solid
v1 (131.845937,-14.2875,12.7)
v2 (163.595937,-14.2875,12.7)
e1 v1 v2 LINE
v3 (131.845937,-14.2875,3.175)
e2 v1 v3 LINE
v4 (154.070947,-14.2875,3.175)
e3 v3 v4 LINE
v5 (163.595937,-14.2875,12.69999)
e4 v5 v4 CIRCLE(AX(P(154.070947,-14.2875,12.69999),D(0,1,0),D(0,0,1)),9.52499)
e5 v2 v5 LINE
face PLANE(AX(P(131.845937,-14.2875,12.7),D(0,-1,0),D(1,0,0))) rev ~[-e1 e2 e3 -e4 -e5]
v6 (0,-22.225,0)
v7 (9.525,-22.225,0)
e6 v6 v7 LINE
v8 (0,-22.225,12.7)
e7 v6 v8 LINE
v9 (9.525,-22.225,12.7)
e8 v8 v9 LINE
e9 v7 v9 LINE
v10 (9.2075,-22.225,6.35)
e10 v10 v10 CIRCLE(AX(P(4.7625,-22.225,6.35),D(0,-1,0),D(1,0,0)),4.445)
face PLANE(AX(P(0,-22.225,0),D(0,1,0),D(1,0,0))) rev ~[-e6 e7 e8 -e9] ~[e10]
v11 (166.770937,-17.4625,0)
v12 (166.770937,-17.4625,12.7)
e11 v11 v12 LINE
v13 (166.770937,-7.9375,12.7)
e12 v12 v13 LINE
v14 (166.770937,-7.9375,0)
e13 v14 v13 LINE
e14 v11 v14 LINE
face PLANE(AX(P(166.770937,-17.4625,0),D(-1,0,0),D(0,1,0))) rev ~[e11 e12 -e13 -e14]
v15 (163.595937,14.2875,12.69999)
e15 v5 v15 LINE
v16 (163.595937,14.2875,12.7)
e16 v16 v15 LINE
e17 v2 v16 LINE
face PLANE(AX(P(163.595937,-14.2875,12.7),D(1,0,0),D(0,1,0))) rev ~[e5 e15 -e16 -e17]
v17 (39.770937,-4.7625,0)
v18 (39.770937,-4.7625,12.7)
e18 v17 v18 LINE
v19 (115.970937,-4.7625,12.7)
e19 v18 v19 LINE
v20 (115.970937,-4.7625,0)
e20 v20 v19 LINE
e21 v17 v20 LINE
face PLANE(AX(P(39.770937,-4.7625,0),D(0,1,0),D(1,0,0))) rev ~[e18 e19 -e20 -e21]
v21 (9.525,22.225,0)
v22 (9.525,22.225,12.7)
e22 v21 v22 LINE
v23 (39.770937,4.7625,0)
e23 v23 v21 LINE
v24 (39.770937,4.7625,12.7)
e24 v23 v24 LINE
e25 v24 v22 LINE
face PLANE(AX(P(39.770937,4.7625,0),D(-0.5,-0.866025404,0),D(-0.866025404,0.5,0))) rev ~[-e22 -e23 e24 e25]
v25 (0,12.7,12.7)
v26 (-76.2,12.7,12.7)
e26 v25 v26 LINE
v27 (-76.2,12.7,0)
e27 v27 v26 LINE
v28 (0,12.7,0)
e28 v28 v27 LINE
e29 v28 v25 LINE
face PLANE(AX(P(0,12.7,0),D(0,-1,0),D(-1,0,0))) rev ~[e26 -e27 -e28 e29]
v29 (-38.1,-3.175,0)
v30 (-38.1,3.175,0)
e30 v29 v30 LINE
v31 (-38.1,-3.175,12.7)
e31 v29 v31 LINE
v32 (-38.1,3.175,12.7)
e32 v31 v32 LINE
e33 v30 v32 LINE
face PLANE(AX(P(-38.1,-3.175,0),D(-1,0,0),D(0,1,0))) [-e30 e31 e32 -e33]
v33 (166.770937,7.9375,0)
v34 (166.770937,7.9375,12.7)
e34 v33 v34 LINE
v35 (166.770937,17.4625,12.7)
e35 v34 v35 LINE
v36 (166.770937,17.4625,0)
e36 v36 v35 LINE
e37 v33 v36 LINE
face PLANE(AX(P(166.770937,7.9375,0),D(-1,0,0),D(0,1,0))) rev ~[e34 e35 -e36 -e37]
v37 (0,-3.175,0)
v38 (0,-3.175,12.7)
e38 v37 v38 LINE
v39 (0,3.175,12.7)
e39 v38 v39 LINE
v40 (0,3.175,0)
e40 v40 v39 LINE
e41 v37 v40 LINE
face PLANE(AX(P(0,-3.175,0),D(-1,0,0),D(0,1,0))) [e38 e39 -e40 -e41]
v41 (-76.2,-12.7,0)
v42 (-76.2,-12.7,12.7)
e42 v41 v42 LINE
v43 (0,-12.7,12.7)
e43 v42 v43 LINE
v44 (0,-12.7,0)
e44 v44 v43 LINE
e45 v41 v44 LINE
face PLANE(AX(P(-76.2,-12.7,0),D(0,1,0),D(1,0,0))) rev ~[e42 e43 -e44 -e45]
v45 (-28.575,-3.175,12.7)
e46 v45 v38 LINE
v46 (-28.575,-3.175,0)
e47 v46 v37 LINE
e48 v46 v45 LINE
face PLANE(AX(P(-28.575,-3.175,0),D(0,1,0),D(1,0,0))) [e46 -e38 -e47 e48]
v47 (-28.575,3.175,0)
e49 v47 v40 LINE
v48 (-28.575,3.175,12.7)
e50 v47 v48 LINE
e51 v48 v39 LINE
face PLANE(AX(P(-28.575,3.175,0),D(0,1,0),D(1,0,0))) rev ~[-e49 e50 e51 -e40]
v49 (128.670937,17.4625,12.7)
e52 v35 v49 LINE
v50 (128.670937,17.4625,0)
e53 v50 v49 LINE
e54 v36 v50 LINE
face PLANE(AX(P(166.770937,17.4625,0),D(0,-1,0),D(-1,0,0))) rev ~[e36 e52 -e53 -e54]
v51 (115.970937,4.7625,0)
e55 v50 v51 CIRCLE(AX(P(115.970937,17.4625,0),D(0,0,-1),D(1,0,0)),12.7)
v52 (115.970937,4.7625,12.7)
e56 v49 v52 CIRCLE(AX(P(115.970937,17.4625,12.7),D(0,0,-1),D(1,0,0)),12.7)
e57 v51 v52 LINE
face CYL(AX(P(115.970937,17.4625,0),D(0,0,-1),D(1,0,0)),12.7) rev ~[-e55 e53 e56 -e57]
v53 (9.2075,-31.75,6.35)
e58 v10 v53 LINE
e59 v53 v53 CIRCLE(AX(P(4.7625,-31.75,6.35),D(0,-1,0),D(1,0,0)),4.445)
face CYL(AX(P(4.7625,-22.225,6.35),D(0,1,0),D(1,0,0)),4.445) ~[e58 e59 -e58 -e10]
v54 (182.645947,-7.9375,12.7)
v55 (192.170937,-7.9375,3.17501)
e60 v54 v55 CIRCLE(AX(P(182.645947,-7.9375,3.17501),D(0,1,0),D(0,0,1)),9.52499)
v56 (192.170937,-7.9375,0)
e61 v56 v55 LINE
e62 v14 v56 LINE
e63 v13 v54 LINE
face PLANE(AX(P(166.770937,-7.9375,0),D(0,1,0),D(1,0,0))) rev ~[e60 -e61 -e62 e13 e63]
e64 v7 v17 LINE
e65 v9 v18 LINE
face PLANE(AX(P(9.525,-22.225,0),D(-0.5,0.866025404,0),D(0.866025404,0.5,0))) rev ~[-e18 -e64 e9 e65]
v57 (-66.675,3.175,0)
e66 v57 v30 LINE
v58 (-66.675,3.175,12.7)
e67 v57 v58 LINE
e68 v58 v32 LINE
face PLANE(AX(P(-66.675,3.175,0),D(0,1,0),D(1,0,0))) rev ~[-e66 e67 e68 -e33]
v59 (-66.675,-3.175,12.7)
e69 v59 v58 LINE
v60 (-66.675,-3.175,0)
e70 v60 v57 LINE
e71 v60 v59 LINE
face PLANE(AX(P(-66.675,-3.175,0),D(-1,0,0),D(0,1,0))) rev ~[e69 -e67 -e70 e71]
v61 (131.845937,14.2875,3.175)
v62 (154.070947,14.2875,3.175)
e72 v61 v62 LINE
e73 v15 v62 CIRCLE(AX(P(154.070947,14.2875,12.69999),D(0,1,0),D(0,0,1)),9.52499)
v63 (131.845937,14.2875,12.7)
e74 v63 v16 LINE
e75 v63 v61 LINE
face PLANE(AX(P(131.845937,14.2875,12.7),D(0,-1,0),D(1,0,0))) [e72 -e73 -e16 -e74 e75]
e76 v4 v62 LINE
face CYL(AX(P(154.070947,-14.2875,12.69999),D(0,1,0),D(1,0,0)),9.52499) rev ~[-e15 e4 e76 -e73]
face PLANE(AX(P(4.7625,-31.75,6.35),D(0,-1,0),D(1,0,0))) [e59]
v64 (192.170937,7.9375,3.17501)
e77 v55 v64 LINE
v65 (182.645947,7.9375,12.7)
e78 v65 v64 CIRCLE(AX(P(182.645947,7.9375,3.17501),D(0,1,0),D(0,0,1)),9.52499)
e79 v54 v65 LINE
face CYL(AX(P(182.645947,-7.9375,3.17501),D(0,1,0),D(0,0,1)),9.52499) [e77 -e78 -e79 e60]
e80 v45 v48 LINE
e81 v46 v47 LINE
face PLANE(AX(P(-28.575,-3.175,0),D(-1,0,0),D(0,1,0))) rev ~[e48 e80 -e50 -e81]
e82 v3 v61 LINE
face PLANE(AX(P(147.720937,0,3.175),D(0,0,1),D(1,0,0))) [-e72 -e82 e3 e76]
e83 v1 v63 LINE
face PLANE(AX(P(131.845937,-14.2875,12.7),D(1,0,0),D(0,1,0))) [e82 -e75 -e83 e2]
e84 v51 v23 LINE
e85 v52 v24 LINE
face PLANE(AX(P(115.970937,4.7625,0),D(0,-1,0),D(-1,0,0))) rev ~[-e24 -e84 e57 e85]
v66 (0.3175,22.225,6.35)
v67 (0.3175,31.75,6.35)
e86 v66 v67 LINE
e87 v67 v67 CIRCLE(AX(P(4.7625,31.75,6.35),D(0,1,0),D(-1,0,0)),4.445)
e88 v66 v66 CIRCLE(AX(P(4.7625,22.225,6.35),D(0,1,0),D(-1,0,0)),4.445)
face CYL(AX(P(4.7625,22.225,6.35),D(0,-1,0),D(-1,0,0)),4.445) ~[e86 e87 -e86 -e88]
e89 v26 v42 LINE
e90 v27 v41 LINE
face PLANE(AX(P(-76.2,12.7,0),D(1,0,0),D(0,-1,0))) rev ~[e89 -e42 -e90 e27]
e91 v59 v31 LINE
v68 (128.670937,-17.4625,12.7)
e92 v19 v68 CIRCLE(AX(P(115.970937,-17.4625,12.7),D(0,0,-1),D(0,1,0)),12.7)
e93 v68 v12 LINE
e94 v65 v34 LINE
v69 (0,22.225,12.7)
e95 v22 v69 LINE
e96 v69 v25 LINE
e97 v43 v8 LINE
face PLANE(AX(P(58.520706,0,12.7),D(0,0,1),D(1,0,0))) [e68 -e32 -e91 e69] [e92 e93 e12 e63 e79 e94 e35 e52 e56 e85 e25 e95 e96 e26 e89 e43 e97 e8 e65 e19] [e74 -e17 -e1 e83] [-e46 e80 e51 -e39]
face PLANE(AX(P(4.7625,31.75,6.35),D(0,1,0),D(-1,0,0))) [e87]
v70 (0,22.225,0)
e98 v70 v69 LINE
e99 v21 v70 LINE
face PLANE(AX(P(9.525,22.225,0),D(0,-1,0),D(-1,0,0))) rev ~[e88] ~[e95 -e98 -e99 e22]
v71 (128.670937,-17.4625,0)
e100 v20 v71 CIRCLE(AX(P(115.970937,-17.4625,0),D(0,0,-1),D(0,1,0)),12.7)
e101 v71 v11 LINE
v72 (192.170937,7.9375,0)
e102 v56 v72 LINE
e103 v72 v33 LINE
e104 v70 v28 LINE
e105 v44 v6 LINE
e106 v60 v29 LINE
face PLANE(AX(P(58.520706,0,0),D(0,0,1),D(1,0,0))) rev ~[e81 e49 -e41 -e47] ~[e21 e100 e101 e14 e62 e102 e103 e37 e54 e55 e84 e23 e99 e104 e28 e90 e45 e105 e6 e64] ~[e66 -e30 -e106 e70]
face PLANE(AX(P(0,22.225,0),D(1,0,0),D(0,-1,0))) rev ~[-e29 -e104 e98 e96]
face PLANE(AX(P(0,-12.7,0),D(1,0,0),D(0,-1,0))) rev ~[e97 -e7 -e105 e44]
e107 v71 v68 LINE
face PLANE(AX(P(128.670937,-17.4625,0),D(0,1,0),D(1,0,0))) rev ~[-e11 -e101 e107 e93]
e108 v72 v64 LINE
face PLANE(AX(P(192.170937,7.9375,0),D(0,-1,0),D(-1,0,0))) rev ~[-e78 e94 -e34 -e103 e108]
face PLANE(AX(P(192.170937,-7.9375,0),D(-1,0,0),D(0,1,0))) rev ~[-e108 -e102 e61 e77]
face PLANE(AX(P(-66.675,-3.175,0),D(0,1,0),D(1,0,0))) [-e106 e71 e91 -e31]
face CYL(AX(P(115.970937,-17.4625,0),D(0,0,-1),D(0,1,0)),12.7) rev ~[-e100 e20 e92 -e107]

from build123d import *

# Parameters (mm, degrees)
F0_W     = 28.575
F0_H     = 6.35
F1_DEPTH = 12.7
F2_R     = 4.445
F3_DEPTH = 9.525
F4_R     = 4.445
F5_DEPTH = 9.525
F6_W     = 31.75
F6_H     = 28.575
F7_DEPTH = 9.525
F8_R     = 9.52499


# Not quite as in the source:
# - a fillet or chamfer is up to 0.001 mm smaller than in the source, because OpenCascade refuses the exact size


with BuildPart() as f1:
    # F0 (on Top) → F1 (new body)
    with BuildSketch(Plane.XY):
        with BuildLine():
            Line((-76.2, -12.7), (0, -12.7))
            Line((0, -12.7), (0, -22.225))
            Line((0, -22.225), (9.525, -22.225))
            Line((9.525, -22.225), (39.7709372272, -4.7625))
            Line((39.7709372272, -4.7625), (115.9709372272, -4.7625))
            ThreePointArc((115.9709372272, -4.7625), (124.9511933482, -8.4822438789), (128.6709372272, -17.4625))
            Line((128.6709372272, -17.4625), (166.7709372272, -17.4625))
            Line((166.7709372272, -17.4625), (166.7709372272, -7.9375))
            Line((166.7709372272, -7.9375), (192.1709372272, -7.9375))
            Line((192.1709372272, -7.9375), (192.1709372272, 7.9375))
            Line((192.1709372272, 7.9375), (166.7709372272, 7.9375))
            Line((166.7709372272, 7.9375), (166.7709372272, 17.4625))
            Line((166.7709372272, 17.4625), (128.6709372272, 17.4625))
            ThreePointArc((128.6709372272, 17.4625), (124.9511933482, 8.4822438789), (115.9709372272, 4.7625))
            Line((115.9709372272, 4.7625), (39.7709372272, 4.7625))
            Line((39.7709372272, 4.7625), (9.525, 22.225))
            Line((9.525, 22.225), (0, 22.225))
            Line((0, 22.225), (0, 12.7))
            Line((0, 12.7), (-76.2, 12.7))
            Line((-76.2, 12.7), (-76.2, -12.7))
        make_face()
        with Locations((-52.3875, 0)):
            Rectangle(F0_W, F0_H, mode=Mode.SUBTRACT)
        with Locations((-14.2875, 0)):
            Rectangle(F0_W, F0_H, mode=Mode.SUBTRACT)
    extrude(amount=F1_DEPTH)

    # F2 (on face) → F3 (join)
    with BuildSketch(Plane.XZ.offset(22.225)):
        with Locations((4.7625, 6.35)):
            Circle(F2_R)
    extrude(amount=F3_DEPTH)

    # F4 (on face) → F5 (join)
    with BuildSketch(Plane(origin=(0, 22.225, 0), x_dir=(-1, 0, 0), z_dir=(0, 1, 0))):
        with Locations((-4.7625, 6.35)):
            Circle(F4_R)
    extrude(amount=F5_DEPTH)

    # F6 (on face) → F7 (cut)
    with BuildSketch(Plane.XY.offset(12.7)):
        with Locations((147.7209372272, 0)):
            Rectangle(F6_W, F6_H)
    extrude(amount=-F7_DEPTH, mode=Mode.SUBTRACT)

    # F8 (radius 9.525 in the source; OpenCascade refuses exactly that, so slightly less here)
    f8_edges = [f1.edges().sort_by_distance(p)[0] for p in [
        (163.595937, 0, 3.175),
        (192.170937, 0, 12.7),
    ]]
    fillet(f8_edges, radius=F8_R)


solid = f1.part
